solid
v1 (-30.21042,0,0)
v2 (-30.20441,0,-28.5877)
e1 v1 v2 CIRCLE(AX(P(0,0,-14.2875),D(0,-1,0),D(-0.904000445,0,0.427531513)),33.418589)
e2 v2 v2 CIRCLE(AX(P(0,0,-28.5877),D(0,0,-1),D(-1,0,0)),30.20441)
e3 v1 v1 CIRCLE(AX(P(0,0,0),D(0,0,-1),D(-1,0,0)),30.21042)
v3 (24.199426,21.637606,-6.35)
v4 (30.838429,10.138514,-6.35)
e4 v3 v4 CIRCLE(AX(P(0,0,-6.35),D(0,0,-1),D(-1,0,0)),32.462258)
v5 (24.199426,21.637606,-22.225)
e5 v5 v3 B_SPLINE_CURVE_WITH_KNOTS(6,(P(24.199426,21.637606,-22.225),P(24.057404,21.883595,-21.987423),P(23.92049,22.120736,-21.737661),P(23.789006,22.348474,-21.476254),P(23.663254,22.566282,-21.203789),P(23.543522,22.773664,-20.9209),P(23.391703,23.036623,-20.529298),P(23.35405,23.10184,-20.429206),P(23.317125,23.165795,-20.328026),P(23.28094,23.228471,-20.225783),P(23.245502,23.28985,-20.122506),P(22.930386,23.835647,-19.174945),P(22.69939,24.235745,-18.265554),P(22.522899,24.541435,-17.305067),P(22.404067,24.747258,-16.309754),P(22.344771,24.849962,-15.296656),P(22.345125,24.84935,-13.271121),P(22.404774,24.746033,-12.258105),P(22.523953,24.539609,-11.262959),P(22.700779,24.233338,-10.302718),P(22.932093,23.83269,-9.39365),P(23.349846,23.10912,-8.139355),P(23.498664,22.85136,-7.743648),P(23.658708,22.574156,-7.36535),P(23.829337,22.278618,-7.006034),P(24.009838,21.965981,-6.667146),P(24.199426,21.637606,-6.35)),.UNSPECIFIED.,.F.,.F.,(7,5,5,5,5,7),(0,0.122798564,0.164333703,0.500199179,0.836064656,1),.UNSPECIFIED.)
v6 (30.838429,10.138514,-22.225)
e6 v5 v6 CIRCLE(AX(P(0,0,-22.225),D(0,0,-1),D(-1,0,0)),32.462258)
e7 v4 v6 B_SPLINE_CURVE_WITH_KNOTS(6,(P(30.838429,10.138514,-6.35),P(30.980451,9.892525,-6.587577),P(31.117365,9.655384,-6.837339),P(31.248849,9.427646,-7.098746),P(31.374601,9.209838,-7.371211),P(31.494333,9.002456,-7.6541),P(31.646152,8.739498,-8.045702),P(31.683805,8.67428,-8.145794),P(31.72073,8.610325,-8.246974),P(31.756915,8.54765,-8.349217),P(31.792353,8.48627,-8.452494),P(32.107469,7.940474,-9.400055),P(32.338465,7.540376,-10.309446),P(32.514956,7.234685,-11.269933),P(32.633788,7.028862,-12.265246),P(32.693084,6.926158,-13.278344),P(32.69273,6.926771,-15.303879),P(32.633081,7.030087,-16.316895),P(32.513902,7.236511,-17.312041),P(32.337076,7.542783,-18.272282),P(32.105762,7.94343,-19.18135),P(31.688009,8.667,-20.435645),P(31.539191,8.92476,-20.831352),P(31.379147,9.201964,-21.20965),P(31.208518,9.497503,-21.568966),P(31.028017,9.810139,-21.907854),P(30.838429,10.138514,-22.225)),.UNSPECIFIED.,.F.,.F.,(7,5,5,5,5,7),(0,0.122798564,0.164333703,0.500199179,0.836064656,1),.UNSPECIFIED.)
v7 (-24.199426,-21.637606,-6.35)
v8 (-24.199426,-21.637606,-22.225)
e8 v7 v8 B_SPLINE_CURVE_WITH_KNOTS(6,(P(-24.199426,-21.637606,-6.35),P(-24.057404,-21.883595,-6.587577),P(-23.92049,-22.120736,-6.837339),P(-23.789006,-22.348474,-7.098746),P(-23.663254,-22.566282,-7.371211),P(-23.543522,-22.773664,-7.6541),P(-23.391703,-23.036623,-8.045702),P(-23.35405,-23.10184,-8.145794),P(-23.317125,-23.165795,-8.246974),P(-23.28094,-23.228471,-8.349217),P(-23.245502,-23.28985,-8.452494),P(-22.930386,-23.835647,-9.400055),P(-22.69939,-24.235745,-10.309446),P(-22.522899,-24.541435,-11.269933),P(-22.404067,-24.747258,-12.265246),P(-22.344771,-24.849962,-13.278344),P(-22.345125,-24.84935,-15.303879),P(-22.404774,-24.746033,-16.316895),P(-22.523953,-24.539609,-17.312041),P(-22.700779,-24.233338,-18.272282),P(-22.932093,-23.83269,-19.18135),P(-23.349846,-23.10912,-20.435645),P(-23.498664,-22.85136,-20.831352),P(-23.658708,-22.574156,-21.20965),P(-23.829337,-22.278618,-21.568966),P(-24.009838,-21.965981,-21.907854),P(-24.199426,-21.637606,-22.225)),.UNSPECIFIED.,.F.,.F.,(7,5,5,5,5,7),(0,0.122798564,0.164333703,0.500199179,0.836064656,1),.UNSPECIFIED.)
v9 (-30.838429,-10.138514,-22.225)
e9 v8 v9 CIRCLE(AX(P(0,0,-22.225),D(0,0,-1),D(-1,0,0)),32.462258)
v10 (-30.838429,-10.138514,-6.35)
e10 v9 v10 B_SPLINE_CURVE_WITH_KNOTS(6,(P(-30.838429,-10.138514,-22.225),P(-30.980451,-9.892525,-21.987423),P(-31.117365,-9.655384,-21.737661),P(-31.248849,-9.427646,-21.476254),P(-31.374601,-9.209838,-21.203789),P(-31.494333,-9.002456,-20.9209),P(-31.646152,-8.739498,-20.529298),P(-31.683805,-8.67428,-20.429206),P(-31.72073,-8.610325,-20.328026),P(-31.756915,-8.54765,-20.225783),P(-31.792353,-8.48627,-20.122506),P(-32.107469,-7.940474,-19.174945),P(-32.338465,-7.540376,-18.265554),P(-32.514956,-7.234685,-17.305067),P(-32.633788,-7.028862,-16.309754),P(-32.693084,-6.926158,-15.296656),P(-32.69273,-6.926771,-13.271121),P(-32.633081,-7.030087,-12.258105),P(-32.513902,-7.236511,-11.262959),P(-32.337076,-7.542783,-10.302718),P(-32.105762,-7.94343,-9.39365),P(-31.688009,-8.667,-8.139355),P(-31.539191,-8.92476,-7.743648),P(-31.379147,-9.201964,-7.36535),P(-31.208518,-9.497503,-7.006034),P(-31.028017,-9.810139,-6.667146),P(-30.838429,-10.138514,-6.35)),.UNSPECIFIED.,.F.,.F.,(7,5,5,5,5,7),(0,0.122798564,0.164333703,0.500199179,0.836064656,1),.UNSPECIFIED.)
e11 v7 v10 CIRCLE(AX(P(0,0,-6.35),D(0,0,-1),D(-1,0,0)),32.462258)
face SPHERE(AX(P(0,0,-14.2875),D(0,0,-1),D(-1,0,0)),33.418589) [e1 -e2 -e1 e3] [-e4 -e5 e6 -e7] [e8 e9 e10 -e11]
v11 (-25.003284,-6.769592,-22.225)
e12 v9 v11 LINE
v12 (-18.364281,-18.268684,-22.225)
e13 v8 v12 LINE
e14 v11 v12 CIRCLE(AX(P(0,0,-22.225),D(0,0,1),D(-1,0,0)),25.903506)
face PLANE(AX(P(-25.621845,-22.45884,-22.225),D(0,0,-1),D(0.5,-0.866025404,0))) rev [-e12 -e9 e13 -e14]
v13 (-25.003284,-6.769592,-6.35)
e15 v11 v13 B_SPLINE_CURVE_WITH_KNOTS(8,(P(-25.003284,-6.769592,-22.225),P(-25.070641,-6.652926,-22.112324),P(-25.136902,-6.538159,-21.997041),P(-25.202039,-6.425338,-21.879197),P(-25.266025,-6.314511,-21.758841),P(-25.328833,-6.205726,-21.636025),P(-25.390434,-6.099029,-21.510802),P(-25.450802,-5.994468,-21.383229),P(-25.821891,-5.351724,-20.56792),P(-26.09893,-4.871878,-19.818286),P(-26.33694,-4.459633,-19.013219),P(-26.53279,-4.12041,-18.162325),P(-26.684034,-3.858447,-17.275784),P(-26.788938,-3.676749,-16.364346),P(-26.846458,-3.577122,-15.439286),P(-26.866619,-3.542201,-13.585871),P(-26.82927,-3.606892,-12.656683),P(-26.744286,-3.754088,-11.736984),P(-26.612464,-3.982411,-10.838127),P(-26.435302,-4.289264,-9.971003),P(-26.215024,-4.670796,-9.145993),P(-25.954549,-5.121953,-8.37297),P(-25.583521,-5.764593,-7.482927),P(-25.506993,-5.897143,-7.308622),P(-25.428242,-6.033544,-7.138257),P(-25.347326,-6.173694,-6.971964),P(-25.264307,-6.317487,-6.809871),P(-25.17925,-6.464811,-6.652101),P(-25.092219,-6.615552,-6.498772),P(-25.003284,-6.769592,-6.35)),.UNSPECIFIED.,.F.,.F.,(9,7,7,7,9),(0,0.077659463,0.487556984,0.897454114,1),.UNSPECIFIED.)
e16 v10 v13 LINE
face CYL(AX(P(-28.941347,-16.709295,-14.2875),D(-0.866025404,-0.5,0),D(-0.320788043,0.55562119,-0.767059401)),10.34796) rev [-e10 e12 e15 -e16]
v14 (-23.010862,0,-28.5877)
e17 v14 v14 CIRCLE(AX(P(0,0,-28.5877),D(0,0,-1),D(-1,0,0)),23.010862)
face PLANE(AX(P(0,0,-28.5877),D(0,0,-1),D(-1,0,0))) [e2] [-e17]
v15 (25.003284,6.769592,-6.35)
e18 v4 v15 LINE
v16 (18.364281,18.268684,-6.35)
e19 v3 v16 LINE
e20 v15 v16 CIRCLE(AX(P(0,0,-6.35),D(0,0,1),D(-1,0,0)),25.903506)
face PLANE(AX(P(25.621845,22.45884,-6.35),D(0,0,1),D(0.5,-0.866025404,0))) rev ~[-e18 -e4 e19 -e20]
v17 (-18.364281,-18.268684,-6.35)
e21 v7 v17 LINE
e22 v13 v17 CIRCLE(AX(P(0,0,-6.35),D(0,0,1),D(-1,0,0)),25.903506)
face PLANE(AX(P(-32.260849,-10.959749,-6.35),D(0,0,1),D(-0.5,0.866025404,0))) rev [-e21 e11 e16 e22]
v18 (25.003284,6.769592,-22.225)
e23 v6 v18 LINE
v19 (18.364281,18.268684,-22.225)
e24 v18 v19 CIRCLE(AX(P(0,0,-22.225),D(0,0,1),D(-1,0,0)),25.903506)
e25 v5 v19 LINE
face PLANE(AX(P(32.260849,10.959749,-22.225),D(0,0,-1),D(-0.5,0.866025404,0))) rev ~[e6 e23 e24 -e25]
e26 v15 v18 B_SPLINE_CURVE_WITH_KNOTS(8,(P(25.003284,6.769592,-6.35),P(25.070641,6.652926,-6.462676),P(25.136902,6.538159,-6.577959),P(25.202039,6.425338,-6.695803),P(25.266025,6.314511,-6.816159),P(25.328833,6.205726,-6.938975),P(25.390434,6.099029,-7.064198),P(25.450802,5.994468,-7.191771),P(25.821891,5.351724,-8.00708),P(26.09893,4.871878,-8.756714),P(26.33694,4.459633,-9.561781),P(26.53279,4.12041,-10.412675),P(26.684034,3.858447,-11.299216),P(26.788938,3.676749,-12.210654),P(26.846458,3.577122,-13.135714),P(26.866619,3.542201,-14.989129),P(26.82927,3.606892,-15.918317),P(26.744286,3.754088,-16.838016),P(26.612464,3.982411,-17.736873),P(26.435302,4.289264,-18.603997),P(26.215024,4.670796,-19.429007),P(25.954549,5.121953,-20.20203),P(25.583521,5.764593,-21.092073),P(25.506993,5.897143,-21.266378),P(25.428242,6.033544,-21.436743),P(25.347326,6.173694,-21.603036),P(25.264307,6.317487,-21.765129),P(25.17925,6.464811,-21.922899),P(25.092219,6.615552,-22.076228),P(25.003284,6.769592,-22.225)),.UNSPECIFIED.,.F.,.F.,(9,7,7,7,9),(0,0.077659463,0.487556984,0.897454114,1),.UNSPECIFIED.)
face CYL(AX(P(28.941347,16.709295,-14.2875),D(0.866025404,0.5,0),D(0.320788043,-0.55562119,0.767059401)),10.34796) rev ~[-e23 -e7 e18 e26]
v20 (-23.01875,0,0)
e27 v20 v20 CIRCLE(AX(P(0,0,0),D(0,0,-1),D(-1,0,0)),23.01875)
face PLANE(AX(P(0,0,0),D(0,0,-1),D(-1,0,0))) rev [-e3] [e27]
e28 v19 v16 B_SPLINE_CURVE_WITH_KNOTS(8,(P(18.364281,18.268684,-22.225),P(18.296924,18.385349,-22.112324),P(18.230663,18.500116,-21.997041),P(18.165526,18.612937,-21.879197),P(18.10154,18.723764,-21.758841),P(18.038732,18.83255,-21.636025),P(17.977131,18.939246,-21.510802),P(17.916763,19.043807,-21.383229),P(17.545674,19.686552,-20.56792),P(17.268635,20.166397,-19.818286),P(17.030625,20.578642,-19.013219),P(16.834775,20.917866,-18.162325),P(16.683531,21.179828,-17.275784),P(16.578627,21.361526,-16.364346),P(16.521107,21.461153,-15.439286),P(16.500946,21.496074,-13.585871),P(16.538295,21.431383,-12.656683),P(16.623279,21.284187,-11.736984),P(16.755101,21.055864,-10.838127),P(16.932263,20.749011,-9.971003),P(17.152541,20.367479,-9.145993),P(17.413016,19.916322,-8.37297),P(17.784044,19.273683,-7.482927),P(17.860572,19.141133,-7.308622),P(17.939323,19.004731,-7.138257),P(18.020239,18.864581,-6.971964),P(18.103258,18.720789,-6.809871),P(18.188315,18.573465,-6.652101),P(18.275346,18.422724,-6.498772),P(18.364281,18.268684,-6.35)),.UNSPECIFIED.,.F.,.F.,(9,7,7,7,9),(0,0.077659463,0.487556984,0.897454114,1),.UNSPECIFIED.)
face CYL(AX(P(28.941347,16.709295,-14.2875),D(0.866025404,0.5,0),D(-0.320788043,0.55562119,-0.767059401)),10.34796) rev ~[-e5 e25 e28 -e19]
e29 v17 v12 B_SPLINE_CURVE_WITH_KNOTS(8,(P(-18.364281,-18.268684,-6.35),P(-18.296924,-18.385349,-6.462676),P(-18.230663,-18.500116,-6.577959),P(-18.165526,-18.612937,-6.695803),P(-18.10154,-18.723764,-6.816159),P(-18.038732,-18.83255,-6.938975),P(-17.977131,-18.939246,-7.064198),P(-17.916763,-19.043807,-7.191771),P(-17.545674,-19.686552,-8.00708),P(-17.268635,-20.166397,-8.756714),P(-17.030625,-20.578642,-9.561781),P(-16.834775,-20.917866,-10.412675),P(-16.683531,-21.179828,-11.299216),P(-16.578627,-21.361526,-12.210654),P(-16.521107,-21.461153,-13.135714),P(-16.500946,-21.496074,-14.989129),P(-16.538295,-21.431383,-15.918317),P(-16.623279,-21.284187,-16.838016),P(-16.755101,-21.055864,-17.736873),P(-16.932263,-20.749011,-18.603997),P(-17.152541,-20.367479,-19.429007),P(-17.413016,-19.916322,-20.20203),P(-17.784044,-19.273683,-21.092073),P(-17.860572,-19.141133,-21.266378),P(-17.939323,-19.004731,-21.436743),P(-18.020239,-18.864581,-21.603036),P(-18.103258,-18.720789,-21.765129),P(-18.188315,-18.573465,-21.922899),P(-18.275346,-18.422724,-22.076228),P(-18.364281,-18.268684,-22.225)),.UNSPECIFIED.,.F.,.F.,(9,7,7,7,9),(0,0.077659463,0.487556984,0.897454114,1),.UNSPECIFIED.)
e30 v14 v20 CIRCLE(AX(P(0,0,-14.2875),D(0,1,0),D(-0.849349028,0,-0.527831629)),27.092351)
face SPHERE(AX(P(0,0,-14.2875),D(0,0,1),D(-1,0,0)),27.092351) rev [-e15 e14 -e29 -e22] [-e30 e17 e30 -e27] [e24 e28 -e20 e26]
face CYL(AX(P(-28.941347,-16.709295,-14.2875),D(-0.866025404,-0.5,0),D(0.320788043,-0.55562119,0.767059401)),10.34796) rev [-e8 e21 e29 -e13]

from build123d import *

# Parameters (mm, degrees)
F5_DEPTH = 12.7


# Not quite as in the source:
# - a pattern or mirror of a feature is missing from the dataset's text; its kind, count and spacing are read off the source's solid


with BuildPart() as f1:
    # F0 (on Front) → F1 (revolve)
    with BuildSketch(Plane.XZ):
        with BuildLine():
            ThreePointArc((-23.0108623865, -28.5877), (-27.0923504321, -14.2949750325), (-23.01875, 0))
            Line((-23.01875, 0), (-30.2104195144, 0))
            ThreePointArc((-30.2104195144, 0), (-33.4185884522, -14.2945250314), (-30.20441, -28.5877))
            Line((-30.20441, -28.5877), (-23.0108623865, -28.5877))
        make_face()
    revolve(axis=Axis((0, 0, -13.0283376202), (0, 0, -1)))

    # F4 (on line) → F5 (cut)
    with BuildSketch(Plane(origin=(28.9413471977, 16.7092945953, 0), x_dir=(-0.5, 0.8660254038, 0), z_dir=(0.8660254038, 0.5, 0))):
        with BuildLine():
            Line((-6.6390036837, -22.225), (6.6390036837, -22.225))
            ThreePointArc((6.6390036837, -22.225), (10.34796, -14.2875), (6.6390036837, -6.35))
            Line((6.6390036837, -6.35), (-6.6390036837, -6.35))
            ThreePointArc((-6.6390036837, -6.35), (-10.34796, -14.2875), (-6.6390036837, -22.225))
        make_face()
    f5 = extrude(amount=-F5_DEPTH, mode=Mode.SUBTRACT)

    # F5_copies: F5 across plane
    add(f5.mirror(Plane(origin=(0, 0, 0), x_dir=(0.5, -0.8660254038, 0), z_dir=(-0.8660254038, -0.5, 0))), mode=Mode.SUBTRACT)


solid = f1.part
